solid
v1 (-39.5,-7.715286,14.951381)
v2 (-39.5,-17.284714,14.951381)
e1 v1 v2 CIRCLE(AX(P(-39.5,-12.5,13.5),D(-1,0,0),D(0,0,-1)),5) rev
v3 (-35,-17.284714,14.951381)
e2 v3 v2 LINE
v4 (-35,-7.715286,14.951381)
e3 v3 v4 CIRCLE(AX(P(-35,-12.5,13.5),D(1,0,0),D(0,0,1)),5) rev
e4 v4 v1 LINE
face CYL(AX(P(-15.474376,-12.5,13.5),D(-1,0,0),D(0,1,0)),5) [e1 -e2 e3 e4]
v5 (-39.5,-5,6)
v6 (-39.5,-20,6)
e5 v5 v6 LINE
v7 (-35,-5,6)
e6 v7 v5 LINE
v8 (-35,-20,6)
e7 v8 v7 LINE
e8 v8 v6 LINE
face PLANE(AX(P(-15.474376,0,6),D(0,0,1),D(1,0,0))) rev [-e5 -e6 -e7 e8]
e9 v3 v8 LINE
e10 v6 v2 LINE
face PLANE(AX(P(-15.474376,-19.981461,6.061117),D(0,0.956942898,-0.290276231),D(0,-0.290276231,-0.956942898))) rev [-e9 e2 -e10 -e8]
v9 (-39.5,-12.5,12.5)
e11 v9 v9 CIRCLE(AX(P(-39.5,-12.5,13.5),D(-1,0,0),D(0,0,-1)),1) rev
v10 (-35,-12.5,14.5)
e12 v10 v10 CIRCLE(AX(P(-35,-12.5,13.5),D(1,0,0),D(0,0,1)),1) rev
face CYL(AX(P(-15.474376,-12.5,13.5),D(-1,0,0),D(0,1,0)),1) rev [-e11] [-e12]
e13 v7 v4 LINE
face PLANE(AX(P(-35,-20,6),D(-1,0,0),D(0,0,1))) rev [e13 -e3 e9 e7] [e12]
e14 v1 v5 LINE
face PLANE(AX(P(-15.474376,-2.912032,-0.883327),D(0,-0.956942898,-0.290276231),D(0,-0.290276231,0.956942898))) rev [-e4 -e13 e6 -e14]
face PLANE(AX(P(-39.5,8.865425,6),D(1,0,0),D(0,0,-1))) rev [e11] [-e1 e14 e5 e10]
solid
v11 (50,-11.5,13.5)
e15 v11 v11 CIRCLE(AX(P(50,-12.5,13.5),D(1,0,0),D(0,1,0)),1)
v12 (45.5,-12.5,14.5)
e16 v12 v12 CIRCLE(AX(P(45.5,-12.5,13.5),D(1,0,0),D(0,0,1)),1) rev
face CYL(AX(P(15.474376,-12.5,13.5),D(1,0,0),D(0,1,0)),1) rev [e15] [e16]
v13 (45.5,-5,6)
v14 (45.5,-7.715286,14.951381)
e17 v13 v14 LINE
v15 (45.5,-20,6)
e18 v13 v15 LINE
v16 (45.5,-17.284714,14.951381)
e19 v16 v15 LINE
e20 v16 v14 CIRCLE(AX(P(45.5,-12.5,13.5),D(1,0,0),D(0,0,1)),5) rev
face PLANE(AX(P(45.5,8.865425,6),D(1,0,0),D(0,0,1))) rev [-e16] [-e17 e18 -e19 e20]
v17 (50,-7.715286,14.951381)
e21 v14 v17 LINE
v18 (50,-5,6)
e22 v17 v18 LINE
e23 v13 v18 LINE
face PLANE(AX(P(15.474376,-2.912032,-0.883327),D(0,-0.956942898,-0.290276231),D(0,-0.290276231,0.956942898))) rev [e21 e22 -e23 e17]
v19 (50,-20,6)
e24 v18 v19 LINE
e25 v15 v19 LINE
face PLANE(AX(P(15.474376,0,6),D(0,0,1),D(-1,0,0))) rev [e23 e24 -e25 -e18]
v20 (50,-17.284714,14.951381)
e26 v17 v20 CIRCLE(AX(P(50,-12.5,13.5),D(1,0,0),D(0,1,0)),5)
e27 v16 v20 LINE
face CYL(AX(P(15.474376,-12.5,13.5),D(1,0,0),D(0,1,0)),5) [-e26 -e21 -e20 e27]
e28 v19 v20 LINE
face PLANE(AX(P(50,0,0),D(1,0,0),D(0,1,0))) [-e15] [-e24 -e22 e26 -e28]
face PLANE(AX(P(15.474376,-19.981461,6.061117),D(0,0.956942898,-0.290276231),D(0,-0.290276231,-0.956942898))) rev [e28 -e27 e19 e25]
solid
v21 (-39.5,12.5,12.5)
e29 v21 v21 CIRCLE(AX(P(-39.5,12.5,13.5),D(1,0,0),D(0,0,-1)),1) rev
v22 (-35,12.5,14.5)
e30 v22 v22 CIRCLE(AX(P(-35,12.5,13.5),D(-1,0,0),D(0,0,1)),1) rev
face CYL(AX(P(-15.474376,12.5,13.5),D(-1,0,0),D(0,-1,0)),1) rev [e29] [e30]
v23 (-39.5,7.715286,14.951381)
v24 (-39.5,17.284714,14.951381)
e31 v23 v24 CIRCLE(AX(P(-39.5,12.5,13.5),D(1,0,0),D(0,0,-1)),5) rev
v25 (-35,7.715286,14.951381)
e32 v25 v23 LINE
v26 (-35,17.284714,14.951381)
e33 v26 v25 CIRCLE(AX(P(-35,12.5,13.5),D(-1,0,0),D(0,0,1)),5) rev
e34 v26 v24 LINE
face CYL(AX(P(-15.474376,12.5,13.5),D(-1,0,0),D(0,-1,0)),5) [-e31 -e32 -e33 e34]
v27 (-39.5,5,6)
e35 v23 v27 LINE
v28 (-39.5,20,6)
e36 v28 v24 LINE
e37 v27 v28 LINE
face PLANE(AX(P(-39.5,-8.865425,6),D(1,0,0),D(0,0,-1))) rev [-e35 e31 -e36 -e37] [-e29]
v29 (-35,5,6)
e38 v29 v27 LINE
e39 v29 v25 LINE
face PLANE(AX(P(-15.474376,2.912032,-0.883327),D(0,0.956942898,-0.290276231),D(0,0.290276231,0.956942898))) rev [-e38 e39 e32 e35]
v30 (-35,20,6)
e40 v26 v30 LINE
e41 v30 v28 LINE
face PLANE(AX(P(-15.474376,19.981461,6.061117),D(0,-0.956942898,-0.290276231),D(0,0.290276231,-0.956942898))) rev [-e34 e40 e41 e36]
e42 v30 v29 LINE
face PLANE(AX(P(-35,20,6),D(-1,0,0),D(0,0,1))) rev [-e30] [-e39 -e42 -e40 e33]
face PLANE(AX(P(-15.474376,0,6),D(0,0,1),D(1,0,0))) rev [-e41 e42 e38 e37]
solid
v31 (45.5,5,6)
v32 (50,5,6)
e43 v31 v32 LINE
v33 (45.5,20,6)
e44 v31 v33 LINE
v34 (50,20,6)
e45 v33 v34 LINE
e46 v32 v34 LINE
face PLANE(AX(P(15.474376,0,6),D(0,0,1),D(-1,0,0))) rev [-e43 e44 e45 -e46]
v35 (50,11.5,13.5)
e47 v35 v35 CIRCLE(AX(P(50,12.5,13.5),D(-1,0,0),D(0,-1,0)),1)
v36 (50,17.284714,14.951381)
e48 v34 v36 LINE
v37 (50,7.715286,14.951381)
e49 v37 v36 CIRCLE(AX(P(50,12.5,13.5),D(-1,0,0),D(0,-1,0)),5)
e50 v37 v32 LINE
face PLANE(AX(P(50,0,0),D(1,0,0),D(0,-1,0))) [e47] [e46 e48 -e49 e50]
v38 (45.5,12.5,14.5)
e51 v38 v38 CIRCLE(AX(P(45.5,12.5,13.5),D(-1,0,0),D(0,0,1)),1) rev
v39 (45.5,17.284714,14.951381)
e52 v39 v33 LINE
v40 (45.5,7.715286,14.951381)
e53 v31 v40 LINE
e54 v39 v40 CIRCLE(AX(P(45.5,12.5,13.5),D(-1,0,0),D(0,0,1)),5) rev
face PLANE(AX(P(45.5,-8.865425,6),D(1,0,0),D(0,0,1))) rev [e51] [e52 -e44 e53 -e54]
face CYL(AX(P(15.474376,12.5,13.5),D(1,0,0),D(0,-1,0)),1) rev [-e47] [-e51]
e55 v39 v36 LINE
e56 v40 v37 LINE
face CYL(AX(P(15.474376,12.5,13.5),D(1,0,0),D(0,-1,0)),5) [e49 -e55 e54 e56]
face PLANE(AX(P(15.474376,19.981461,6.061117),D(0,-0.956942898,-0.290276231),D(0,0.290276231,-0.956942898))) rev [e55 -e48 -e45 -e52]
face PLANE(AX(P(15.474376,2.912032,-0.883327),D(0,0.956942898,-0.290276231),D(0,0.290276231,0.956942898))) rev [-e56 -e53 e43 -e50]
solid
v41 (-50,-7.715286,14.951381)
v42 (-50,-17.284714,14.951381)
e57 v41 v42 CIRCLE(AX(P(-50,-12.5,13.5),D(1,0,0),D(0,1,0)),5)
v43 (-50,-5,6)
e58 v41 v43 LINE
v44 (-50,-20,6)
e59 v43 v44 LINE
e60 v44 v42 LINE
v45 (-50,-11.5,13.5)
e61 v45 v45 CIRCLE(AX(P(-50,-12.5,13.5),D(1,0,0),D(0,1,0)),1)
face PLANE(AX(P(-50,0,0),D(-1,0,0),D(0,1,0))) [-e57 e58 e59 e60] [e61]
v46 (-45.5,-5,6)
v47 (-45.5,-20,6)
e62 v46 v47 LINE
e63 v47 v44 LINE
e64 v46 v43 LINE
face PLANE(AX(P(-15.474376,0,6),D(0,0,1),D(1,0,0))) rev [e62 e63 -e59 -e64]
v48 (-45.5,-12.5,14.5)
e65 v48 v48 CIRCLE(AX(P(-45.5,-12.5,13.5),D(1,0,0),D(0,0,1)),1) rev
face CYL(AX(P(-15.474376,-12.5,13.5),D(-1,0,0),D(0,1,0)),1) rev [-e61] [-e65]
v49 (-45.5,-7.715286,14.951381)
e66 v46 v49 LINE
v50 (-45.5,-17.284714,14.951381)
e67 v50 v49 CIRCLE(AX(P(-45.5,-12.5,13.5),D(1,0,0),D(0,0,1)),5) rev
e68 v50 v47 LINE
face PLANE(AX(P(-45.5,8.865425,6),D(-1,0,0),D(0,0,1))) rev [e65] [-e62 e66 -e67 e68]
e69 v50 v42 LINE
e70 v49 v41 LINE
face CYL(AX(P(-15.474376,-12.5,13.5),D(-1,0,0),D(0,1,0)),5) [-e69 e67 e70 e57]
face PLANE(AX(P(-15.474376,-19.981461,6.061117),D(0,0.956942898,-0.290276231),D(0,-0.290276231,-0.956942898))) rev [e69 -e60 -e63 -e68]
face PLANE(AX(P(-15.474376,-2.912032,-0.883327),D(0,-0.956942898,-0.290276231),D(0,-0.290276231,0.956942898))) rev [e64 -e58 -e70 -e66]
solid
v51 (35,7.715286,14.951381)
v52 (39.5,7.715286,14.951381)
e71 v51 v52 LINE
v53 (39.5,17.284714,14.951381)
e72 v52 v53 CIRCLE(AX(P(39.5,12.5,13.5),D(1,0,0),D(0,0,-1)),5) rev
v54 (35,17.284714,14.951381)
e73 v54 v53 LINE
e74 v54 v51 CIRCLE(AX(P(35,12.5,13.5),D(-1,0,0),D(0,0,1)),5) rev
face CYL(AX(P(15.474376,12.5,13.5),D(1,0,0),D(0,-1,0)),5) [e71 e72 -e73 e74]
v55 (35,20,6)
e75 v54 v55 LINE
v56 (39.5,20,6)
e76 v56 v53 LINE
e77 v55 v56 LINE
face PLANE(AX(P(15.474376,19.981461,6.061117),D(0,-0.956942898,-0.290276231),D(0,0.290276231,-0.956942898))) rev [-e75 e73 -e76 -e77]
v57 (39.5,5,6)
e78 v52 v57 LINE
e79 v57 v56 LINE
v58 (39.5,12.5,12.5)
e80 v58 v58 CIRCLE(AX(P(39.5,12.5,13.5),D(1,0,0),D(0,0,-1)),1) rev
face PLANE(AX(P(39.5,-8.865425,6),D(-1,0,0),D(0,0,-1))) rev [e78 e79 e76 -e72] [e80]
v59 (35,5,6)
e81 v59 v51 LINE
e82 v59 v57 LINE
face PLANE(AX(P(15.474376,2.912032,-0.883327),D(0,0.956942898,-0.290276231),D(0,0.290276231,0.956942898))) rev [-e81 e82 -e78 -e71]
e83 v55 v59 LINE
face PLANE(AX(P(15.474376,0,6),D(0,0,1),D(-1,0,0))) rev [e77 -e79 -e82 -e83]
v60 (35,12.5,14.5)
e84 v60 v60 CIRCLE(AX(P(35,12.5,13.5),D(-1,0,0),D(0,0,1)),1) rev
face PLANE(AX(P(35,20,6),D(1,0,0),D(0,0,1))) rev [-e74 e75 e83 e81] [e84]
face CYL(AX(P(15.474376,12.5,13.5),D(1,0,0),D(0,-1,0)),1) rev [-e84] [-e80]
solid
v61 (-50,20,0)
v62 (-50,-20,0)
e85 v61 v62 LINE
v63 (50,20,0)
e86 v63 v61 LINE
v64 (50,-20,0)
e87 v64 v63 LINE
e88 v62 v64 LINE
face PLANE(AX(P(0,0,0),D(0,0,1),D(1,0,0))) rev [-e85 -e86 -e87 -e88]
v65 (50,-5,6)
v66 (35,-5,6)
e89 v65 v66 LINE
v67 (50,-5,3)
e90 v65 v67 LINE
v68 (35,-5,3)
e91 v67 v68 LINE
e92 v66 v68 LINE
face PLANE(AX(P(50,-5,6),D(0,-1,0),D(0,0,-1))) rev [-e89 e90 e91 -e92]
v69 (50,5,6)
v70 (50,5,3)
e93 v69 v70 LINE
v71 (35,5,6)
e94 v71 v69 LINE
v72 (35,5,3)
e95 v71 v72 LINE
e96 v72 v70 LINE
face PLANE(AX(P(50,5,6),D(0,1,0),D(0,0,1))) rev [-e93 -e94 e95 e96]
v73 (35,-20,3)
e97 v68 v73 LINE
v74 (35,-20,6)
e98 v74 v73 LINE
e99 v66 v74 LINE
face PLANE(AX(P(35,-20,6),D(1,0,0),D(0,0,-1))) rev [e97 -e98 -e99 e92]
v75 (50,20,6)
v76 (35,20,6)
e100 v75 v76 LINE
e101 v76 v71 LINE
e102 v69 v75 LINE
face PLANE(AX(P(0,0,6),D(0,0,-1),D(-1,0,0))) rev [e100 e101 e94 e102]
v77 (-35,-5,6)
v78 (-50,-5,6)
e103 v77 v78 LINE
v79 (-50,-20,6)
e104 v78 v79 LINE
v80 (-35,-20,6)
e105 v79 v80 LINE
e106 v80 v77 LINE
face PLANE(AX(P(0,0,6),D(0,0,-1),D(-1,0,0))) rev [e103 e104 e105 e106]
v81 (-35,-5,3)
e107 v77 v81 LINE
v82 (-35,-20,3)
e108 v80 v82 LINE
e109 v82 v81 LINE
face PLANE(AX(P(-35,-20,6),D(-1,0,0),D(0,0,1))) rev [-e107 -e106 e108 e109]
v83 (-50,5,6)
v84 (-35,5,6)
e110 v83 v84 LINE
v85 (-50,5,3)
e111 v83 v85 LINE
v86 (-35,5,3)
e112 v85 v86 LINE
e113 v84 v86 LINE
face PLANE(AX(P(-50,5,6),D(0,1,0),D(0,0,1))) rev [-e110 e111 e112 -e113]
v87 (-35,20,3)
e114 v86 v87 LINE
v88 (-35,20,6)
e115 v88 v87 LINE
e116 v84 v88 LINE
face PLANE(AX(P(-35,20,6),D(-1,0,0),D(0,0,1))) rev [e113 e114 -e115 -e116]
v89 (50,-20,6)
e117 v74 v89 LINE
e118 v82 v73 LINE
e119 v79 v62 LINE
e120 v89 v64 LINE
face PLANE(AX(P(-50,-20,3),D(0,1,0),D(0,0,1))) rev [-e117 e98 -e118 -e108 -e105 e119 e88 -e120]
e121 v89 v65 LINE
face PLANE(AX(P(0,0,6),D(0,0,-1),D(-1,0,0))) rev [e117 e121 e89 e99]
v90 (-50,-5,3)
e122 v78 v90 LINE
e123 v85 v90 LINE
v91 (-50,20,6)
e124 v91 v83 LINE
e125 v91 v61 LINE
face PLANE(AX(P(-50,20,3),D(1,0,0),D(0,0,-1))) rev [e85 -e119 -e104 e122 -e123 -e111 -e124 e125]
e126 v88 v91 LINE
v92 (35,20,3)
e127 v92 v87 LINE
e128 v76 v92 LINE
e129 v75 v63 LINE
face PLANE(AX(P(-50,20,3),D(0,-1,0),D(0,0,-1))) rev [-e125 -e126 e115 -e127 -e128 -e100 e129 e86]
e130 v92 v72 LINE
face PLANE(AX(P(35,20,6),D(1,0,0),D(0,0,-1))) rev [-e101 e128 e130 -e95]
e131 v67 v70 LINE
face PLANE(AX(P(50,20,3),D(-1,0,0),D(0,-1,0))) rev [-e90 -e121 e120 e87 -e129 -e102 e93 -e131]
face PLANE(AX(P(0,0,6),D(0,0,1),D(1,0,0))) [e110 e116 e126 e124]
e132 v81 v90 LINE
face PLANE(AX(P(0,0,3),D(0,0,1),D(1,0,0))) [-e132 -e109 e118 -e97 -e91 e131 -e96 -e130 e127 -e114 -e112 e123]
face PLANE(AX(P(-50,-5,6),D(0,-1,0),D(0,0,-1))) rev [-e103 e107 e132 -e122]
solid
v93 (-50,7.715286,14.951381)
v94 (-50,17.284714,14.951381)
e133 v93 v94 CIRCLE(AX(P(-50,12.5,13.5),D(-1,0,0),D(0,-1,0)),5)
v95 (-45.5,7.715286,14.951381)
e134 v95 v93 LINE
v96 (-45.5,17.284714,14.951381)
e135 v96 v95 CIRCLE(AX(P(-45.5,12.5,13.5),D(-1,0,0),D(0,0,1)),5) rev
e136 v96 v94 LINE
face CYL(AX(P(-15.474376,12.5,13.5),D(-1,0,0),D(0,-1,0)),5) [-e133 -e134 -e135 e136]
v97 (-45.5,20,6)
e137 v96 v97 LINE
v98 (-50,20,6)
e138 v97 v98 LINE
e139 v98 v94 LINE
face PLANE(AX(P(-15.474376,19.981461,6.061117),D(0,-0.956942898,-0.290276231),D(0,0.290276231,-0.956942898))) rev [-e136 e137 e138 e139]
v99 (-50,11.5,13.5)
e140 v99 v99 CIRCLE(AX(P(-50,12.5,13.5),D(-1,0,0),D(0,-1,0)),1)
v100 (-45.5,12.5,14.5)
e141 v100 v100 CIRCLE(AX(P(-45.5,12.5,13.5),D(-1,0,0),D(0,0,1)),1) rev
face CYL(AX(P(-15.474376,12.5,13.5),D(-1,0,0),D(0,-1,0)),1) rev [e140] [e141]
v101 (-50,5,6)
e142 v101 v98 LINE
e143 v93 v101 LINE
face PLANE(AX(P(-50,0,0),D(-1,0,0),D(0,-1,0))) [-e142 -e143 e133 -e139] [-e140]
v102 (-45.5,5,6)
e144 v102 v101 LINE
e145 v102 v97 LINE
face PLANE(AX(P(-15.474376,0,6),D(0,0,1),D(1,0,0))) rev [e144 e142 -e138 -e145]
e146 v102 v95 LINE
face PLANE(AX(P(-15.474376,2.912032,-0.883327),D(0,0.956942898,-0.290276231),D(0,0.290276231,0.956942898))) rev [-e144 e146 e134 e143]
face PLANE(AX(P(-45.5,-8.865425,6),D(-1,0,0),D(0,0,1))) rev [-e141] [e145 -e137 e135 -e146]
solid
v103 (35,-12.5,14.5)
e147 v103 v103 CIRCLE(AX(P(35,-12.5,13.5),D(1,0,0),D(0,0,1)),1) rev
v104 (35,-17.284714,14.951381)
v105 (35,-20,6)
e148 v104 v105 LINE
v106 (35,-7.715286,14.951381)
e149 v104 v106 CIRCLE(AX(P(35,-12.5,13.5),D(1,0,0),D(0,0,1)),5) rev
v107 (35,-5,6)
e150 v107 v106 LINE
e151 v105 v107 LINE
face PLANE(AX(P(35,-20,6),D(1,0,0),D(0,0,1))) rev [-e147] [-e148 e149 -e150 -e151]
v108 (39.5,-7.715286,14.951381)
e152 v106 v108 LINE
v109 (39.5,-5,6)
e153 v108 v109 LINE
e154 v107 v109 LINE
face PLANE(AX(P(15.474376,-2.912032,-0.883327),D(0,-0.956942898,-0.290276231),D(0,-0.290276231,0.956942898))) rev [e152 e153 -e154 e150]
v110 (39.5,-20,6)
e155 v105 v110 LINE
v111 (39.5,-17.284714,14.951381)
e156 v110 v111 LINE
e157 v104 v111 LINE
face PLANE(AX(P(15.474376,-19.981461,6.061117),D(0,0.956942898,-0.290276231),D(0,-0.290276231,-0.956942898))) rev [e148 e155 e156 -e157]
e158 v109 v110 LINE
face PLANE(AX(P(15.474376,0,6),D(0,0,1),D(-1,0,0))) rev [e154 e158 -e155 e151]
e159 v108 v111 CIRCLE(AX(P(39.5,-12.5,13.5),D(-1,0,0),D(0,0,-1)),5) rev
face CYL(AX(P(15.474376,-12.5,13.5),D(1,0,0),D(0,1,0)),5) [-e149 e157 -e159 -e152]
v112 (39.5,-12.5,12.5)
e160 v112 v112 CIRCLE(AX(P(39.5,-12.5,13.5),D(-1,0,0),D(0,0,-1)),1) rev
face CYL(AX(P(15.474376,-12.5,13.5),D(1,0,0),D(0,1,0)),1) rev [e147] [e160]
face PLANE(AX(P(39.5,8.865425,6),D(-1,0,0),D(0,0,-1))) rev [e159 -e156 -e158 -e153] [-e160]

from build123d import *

# Parameters (mm, degrees)
SKETCH1_W           = 100
SKETCH1_H           = 40
BOSS_EXTRUDE1_DEPTH = 3
SKETCH2_W           = 15
SKETCH2_H           = 15
BOSS_EXTRUDE2_DEPTH = 3
SKETCH3_R           = 1
BOSS_EXTRUDE3_DEPTH = 15
CUT_EXTRUDE1_REACH  = 68.65
SKETCH4_W           = 6
SKETCH4_H           = 12.5
MIRROR6_START       = 35
MIRROR6_OUTLINE_R   = 1
MIRROR6_DEPTH       = 4.5
MIRROR6_START_2     = 45.5
MIRROR6_2_OUTLINE_R = 1
MIRROR6_2_DEPTH     = 4.5
MIRROR6_START_3     = -50
MIRROR6_3_OUTLINE_R = 1
MIRROR6_3_DEPTH     = 4.5
MIRROR6_START_4     = -39.5
MIRROR6_4_OUTLINE_R = 1
MIRROR6_4_DEPTH     = 4.5


# Read off the part's stored shape, not the designer's step: Mirror6
with BuildPart() as part:
    # Sketch1 → Boss-Extrude1 (new body)
    with BuildSketch(Plane.XY):
        Rectangle(SKETCH1_W, SKETCH1_H)
    extrude(amount=BOSS_EXTRUDE1_DEPTH)

    # Sketch2 → Boss-Extrude2 (add)
    with BuildSketch(Plane.XY.offset(3)):
        with Locations((-42.5, 12.5)):
            Rectangle(SKETCH2_W, SKETCH2_H)
        with Locations((-42.5, -12.5)):
            Rectangle(SKETCH2_W, SKETCH2_H)
        with Locations((42.5, -12.5)):
            Rectangle(SKETCH2_W, SKETCH2_H)
        with Locations((42.5, 12.5)):
            Rectangle(SKETCH2_W, SKETCH2_H)
    extrude(amount=BOSS_EXTRUDE2_DEPTH)


with BuildPart() as body_2:
    # Sketch3 → Boss-Extrude3 (new body)
    with BuildSketch(Plane.ZY.offset(50)):
        with BuildLine():
            Line((14.951381156, 7.715285511), (6, 5))
            Line((6, 5), (6, 20))
            Line((6, 20), (14.951381156, 17.284714489))
            ThreePointArc((14.951381156, 17.284714489), (18.5, 12.5), (14.951381156, 7.715285511))
        make_face()
        with Locations(Location((13.5, 12.5, 0), (0, 0, 270))):
            Circle(SKETCH3_R, mode=Mode.SUBTRACT)
    extrude(amount=-BOSS_EXTRUDE3_DEPTH)

    # Cut-Extrude1: up to this plane
    cut_extrude1_end = Plane(origin=(-15.47437581, 2.912031882, -0.883327147), z_dir=(0, 0.956942897795657, -0.29027623112899026))
    # Sketch4 → Cut-Extrude1 (cut, up to the surface)
    with BuildSketch(Plane(origin=(0, 20, 0), x_dir=(1, 0, 0), z_dir=(0, 1, 0)), mode=Mode.PRIVATE) as cut_extrude1_sk1:
        with Locations((-42.5, -12.25)):
            Rectangle(SKETCH4_W, SKETCH4_H)
    cut_extrude1_tool1 = split(extrude(cut_extrude1_sk1.sketch, amount=-CUT_EXTRUDE1_REACH, mode=Mode.PRIVATE), bisect_by=cut_extrude1_end, keep=Keep.BOTH, mode=Mode.PRIVATE)
    add(cut_extrude1_tool1.solids().sort_by_distance((-42.5, 20, 12.25))[0], mode=Mode.SUBTRACT)


with BuildPart() as cut_extrude1_piece_1:
    # of the separate pieces the step leaves, piece 1, a body of its own (cut_extrude1_pieces)
    add(body_2.part.solids().sort_by_distance((-39.5, 7.715285511, 14.951381156))[0])


with BuildPart() as cut_extrude1_piece_2:
    # of the separate pieces the step leaves, piece 2, a body of its own (cut_extrude1_pieces)
    add(body_2.part.solids().sort_by_distance((-50, 7.715285511, 14.951381156))[0])


with BuildPart() as body_4:
    # Mirror6 outline → Mirror6 (new body)
    # profile 1 of 2: a face of its own
    with BuildSketch(Plane.YZ.offset(MIRROR6_START)):
        with BuildLine():
            Line((-5, 6), (-7.715285511, 14.951381156))
            ThreePointArc((-7.715285511, 14.951381156), (-12.5, 18.5), (-17.284714489, 14.951381156))
            Line((-17.284714489, 14.951381156), (-20, 6))
            Line((-20, 6), (-5, 6))
        make_face()
        with Locations((-12.5, 13.5)):
            Circle(MIRROR6_OUTLINE_R, mode=Mode.SUBTRACT)
    # profile 2 of 2: a face of its own
    with BuildSketch(Plane.YZ.offset(MIRROR6_START)):
        with BuildLine():
            Line((5, 6), (20, 6))
            Line((20, 6), (17.284714489, 14.951381156))
            ThreePointArc((17.284714489, 14.951381156), (12.5, 18.5), (7.715285511, 14.951381156))
            Line((7.715285511, 14.951381156), (5, 6))
        make_face()
        with Locations((12.5, 13.5)):
            Circle(MIRROR6_OUTLINE_R, mode=Mode.SUBTRACT)
    extrude(amount=MIRROR6_DEPTH)


with BuildPart() as body_5:
    # Mirror6 2 outline → Mirror6 2 (new body)
    # profile 1 of 2: a face of its own
    with BuildSketch(Plane.YZ.offset(MIRROR6_START_2)):
        with BuildLine():
            Line((-5, 6), (-7.715285511, 14.951381156))
            ThreePointArc((-7.715285511, 14.951381156), (-12.5, 18.5), (-17.284714489, 14.951381156))
            Line((-17.284714489, 14.951381156), (-20, 6))
            Line((-20, 6), (-5, 6))
        make_face()
        with Locations((-12.5, 13.5)):
            Circle(MIRROR6_2_OUTLINE_R, mode=Mode.SUBTRACT)
    # profile 2 of 2: a face of its own
    with BuildSketch(Plane.YZ.offset(MIRROR6_START_2)):
        with BuildLine():
            Line((5, 6), (20, 6))
            Line((20, 6), (17.284714489, 14.951381156))
            ThreePointArc((17.284714489, 14.951381156), (12.5, 18.5), (7.715285511, 14.951381156))
            Line((7.715285511, 14.951381156), (5, 6))
        make_face()
        with Locations((12.5, 13.5)):
            Circle(MIRROR6_2_OUTLINE_R, mode=Mode.SUBTRACT)
    extrude(amount=MIRROR6_2_DEPTH)


with BuildPart() as body_6:
    # Mirror6 3 outline → Mirror6 3 (new body)
    with BuildSketch(Plane.YZ.offset(MIRROR6_START_3)):
        with BuildLine():
            Line((-5, 6), (-7.715285511, 14.951381156))
            ThreePointArc((-7.715285511, 14.951381156), (-12.5, 18.5), (-17.284714489, 14.951381156))
            Line((-17.284714489, 14.951381156), (-20, 6))
            Line((-20, 6), (-5, 6))
        make_face()
        with Locations((-12.5, 13.5)):
            Circle(MIRROR6_3_OUTLINE_R, mode=Mode.SUBTRACT)
    extrude(amount=MIRROR6_3_DEPTH)


with BuildPart() as body_7:
    # Mirror6 4 outline → Mirror6 4 (new body)
    with BuildSketch(Plane.YZ.offset(MIRROR6_START_4)):
        with BuildLine():
            Line((-5, 6), (-7.715285511, 14.951381156))
            ThreePointArc((-7.715285511, 14.951381156), (-12.5, 18.5), (-17.284714489, 14.951381156))
            Line((-17.284714489, 14.951381156), (-20, 6))
            Line((-20, 6), (-5, 6))
        make_face()
        with Locations((-12.5, 13.5)):
            Circle(MIRROR6_4_OUTLINE_R, mode=Mode.SUBTRACT)
    extrude(amount=MIRROR6_4_DEPTH)


solid = Compound([part.part, cut_extrude1_piece_1.part, cut_extrude1_piece_2.part, body_4.part, body_5.part, body_6.part, body_7.part])
